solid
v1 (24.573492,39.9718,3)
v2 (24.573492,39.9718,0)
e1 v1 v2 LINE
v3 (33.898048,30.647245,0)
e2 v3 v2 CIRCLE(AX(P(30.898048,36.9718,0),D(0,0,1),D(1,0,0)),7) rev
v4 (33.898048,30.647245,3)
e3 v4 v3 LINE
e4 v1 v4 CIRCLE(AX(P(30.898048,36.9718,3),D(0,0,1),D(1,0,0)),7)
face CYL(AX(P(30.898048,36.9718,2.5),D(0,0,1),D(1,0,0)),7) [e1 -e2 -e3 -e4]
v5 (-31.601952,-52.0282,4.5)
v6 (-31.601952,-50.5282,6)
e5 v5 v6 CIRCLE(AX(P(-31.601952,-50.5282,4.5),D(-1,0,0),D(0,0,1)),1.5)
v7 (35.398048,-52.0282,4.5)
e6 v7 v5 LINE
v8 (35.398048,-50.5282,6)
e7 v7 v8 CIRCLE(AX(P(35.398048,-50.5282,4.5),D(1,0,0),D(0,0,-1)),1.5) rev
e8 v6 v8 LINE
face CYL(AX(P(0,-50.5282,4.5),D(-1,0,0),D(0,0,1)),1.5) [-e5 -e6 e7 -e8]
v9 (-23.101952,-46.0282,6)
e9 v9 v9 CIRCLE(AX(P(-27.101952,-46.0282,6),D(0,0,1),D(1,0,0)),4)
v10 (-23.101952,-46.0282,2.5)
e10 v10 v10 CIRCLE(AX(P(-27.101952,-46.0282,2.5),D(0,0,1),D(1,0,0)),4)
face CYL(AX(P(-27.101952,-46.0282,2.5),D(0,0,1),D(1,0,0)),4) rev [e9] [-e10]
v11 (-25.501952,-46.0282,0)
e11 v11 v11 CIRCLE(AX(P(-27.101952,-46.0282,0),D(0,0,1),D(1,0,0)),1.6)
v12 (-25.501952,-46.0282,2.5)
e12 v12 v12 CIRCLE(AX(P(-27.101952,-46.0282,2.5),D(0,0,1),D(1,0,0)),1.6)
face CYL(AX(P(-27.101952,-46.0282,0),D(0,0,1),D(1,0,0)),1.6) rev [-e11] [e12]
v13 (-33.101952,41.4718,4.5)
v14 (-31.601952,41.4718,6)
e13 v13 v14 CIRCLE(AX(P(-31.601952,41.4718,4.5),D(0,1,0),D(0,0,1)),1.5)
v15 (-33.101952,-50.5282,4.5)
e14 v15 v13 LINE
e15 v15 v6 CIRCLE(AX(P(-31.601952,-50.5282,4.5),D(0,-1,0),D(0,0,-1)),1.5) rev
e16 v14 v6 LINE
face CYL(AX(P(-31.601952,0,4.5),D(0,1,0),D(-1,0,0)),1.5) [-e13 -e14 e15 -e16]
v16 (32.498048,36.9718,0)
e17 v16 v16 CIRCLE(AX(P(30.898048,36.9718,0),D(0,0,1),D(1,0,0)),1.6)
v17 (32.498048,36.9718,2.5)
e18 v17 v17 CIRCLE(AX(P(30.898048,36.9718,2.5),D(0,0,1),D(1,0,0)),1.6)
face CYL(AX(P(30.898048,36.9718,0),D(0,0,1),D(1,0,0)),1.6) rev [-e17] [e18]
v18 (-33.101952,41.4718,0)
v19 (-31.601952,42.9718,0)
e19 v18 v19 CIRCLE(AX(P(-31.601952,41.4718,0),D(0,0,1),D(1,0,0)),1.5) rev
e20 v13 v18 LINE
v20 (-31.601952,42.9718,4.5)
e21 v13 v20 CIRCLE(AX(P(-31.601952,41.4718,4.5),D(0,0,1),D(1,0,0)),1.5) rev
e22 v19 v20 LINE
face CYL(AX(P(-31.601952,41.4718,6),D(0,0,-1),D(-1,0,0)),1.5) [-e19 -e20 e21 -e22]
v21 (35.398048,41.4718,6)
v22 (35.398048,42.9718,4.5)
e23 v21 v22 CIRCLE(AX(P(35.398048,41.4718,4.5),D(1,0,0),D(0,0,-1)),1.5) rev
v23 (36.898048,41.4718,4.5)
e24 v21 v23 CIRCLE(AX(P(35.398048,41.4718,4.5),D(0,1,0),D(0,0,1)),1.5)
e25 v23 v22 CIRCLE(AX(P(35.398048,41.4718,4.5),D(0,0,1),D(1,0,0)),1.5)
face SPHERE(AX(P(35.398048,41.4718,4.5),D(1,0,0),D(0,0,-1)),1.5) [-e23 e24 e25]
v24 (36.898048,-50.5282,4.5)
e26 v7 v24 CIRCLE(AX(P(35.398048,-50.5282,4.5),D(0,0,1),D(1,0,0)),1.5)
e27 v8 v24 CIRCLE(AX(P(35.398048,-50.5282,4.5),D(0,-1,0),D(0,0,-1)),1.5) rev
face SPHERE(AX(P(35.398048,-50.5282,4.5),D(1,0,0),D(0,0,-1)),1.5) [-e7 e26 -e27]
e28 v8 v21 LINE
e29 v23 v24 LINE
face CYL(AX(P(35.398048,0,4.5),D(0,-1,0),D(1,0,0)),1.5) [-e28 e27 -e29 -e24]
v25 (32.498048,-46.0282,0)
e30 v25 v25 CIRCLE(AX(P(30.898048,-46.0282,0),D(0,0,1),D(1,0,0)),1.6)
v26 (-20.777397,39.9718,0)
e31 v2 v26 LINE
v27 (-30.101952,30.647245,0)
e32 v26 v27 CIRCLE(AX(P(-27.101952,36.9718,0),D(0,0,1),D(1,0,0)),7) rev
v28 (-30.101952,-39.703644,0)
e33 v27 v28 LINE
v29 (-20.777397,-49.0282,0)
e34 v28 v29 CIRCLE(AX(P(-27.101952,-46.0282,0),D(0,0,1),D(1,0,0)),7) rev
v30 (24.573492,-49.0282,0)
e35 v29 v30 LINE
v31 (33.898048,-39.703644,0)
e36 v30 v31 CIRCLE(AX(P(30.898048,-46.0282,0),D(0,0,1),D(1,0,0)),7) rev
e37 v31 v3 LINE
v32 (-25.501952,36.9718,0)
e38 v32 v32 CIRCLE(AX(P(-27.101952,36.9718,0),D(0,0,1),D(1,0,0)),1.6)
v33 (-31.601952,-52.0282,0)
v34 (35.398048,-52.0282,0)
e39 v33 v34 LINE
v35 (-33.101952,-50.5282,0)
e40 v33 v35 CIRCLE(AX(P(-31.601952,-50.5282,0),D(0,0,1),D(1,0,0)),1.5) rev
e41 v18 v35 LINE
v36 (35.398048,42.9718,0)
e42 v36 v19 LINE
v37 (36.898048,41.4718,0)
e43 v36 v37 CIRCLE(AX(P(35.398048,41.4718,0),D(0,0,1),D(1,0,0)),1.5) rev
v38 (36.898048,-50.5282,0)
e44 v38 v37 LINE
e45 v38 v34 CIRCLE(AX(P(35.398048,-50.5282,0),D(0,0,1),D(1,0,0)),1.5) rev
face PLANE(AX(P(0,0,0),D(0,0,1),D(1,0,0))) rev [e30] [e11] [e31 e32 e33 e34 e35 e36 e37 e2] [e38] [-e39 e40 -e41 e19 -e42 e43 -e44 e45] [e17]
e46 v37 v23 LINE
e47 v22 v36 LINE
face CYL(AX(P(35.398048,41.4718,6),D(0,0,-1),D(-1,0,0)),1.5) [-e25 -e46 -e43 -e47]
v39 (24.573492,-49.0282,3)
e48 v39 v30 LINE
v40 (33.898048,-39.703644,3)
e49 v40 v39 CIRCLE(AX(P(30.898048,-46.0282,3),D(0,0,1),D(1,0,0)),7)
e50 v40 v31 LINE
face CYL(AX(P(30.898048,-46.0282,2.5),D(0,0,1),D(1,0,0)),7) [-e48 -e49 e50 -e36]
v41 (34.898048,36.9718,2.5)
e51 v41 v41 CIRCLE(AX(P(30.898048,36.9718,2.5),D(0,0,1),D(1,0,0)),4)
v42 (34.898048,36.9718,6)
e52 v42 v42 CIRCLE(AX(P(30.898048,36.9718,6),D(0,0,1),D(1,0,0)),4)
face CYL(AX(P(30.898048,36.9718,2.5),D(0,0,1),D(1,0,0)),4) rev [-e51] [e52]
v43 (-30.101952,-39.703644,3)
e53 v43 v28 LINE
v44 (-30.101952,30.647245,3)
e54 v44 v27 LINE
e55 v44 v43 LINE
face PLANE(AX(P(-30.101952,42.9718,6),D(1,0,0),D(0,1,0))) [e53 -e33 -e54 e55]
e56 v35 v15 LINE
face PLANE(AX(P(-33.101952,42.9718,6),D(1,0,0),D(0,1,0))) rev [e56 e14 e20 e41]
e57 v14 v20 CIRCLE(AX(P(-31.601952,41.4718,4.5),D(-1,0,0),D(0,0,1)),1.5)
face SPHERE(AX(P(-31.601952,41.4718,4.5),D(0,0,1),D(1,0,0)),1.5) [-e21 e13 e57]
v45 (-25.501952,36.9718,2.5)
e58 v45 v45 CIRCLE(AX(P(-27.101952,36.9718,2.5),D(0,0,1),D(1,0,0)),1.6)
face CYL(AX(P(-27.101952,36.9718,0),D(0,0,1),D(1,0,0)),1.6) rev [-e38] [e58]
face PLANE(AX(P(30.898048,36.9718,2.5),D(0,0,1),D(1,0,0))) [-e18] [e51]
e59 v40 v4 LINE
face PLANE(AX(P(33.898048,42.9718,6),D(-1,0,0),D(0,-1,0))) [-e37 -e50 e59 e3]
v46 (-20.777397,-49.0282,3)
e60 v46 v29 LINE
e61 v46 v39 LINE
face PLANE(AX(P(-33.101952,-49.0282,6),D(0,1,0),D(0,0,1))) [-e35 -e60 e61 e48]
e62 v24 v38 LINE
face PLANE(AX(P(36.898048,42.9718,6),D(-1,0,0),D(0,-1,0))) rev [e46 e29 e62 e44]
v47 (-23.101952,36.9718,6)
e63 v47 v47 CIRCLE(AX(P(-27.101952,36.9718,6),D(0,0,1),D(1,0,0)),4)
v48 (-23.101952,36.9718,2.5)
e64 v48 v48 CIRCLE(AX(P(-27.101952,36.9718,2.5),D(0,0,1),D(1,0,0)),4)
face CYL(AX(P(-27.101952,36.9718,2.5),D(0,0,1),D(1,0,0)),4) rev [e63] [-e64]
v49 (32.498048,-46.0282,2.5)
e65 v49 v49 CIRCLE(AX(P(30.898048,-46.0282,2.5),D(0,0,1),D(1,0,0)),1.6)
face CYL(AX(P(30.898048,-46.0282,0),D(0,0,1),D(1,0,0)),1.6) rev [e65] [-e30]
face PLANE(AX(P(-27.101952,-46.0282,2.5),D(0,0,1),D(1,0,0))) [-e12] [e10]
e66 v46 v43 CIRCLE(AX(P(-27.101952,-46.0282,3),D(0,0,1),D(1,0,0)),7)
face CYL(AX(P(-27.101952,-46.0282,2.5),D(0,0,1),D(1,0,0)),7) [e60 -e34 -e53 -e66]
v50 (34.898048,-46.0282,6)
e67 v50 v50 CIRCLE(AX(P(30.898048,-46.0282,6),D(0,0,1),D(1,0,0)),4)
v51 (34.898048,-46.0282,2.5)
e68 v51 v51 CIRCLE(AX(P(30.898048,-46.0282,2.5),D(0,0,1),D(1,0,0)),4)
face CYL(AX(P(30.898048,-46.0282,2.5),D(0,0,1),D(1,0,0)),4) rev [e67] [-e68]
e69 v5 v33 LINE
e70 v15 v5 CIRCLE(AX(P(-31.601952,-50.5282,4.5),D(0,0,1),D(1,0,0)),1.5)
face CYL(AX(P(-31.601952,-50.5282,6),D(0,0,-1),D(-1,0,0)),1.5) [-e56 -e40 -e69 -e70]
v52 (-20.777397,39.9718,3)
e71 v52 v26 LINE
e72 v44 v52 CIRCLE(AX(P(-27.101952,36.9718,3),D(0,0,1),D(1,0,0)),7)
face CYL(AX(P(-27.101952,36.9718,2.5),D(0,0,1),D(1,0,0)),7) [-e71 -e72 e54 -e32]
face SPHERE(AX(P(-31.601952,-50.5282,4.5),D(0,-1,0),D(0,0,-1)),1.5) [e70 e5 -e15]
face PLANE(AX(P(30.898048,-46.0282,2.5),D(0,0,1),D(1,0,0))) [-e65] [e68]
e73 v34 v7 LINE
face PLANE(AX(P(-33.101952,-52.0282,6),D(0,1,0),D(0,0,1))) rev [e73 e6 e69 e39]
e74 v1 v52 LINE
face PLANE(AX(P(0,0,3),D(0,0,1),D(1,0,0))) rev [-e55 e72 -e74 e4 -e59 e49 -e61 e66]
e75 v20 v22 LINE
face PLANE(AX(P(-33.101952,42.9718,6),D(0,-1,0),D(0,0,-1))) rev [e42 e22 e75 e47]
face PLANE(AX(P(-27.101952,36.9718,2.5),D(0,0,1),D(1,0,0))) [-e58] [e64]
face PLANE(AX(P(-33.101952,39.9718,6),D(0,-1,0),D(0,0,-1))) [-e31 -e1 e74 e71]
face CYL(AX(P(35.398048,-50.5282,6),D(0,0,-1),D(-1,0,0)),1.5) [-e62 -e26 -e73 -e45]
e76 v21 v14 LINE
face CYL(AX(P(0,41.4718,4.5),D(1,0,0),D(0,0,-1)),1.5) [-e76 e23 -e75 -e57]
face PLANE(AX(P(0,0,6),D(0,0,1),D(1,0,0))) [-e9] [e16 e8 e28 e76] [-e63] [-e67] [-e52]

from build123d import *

# Parameters (mm, degrees)
SKETCH_1_W          = 70
SKETCH_1_H          = 95
EXTRUDE_1_DEPTH     = 6
SKETCH_2_R          = 4
CUT_EXTRUDE_1_DEPTH = 3.5
SKETCH_3_R          = 1.6
CUT_EXTRUDE_2_DEPTH = 65.065587298
SHELL_1_DEPTH       = 3
FILLET_1_R          = 1.5


# Read off the part's stored shape, not the designer's step: 抽壳1
with BuildPart() as part:
    # 草图1 → 凸台-拉伸1 (new body)
    with BuildSketch(Plane.XY):
        with Locations((1.898047722, -4.528199566)):
            Rectangle(SKETCH_1_W, SKETCH_1_H)
    extrude(amount=EXTRUDE_1_DEPTH)

    # 草图2 → 切除-拉伸1 (cut)
    with BuildSketch(Plane.XY.offset(6)):
        with Locations((30.898047722, 36.971800434)):
            Circle(SKETCH_2_R)
        with Locations((-27.101952278, 36.971800434)):
            Circle(SKETCH_2_R)
        with Locations((30.898047722, -46.028199566)):
            Circle(SKETCH_2_R)
        with Locations((-27.101952278, -46.028199566)):
            Circle(SKETCH_2_R)
    extrude(amount=-CUT_EXTRUDE_1_DEPTH, mode=Mode.SUBTRACT)

    # 草图3 → 切除-拉伸2 (cut, through all)
    with BuildSketch(Plane.XY.offset(6)):
        with Locations((30.898047722, 36.971800434)):
            Circle(SKETCH_3_R)
        with Locations((-27.101952278, 36.971800434)):
            Circle(SKETCH_3_R)
        with Locations((-27.101952278, -46.028199566)):
            Circle(SKETCH_3_R)
        with Locations((30.898047722, -46.028199566)):
            Circle(SKETCH_3_R)
    extrude(amount=-CUT_EXTRUDE_2_DEPTH, mode=Mode.SUBTRACT)

    # 抽壳1 outline → 抽壳1 (cut)
    with BuildSketch(Plane.XY):
        with BuildLine():
            Line((-30.101952278, 30.647245114), (-30.101952278, -39.703644246))
            ThreePointArc((-30.101952278, -39.703644246), (-22.152204809, -41.078452098), (-20.777396957, -49.028199566))
            Line((-20.777396957, -49.028199566), (24.573492402, -49.028199566))
            ThreePointArc((24.573492402, -49.028199566), (25.948300254, -41.078452098), (33.898047722, -39.703644246))
            Line((33.898047722, -39.703644246), (33.898047722, 30.647245114))
            ThreePointArc((33.898047722, 30.647245114), (25.948300254, 32.022052966), (24.573492402, 39.971800434))
            Line((24.573492402, 39.971800434), (-20.777396957, 39.971800434))
            ThreePointArc((-20.777396957, 39.971800434), (-22.152204809, 32.022052966), (-30.101952278, 30.647245114))
        make_face()
    extrude(amount=SHELL_1_DEPTH, mode=Mode.SUBTRACT)

    # 圆角1
    fillet_1_edges = [part.edges().sort_by_distance(p)[0] for p in [
        (36.898047722, -4.528199566, 6),
        (1.898047722, 42.971800434, 6),
        (-33.101952278, -4.528199566, 6),
        (-33.101952278, 42.971800434, 3),
        (36.898047722, 42.971800434, 3),
        (36.898047722, -52.028199566, 3),
        (-33.101952278, -52.028199566, 3),
        (1.898047722, -52.028199566, 6),
    ]]
    fillet(fillet_1_edges, radius=FILLET_1_R)


solid = part.part
